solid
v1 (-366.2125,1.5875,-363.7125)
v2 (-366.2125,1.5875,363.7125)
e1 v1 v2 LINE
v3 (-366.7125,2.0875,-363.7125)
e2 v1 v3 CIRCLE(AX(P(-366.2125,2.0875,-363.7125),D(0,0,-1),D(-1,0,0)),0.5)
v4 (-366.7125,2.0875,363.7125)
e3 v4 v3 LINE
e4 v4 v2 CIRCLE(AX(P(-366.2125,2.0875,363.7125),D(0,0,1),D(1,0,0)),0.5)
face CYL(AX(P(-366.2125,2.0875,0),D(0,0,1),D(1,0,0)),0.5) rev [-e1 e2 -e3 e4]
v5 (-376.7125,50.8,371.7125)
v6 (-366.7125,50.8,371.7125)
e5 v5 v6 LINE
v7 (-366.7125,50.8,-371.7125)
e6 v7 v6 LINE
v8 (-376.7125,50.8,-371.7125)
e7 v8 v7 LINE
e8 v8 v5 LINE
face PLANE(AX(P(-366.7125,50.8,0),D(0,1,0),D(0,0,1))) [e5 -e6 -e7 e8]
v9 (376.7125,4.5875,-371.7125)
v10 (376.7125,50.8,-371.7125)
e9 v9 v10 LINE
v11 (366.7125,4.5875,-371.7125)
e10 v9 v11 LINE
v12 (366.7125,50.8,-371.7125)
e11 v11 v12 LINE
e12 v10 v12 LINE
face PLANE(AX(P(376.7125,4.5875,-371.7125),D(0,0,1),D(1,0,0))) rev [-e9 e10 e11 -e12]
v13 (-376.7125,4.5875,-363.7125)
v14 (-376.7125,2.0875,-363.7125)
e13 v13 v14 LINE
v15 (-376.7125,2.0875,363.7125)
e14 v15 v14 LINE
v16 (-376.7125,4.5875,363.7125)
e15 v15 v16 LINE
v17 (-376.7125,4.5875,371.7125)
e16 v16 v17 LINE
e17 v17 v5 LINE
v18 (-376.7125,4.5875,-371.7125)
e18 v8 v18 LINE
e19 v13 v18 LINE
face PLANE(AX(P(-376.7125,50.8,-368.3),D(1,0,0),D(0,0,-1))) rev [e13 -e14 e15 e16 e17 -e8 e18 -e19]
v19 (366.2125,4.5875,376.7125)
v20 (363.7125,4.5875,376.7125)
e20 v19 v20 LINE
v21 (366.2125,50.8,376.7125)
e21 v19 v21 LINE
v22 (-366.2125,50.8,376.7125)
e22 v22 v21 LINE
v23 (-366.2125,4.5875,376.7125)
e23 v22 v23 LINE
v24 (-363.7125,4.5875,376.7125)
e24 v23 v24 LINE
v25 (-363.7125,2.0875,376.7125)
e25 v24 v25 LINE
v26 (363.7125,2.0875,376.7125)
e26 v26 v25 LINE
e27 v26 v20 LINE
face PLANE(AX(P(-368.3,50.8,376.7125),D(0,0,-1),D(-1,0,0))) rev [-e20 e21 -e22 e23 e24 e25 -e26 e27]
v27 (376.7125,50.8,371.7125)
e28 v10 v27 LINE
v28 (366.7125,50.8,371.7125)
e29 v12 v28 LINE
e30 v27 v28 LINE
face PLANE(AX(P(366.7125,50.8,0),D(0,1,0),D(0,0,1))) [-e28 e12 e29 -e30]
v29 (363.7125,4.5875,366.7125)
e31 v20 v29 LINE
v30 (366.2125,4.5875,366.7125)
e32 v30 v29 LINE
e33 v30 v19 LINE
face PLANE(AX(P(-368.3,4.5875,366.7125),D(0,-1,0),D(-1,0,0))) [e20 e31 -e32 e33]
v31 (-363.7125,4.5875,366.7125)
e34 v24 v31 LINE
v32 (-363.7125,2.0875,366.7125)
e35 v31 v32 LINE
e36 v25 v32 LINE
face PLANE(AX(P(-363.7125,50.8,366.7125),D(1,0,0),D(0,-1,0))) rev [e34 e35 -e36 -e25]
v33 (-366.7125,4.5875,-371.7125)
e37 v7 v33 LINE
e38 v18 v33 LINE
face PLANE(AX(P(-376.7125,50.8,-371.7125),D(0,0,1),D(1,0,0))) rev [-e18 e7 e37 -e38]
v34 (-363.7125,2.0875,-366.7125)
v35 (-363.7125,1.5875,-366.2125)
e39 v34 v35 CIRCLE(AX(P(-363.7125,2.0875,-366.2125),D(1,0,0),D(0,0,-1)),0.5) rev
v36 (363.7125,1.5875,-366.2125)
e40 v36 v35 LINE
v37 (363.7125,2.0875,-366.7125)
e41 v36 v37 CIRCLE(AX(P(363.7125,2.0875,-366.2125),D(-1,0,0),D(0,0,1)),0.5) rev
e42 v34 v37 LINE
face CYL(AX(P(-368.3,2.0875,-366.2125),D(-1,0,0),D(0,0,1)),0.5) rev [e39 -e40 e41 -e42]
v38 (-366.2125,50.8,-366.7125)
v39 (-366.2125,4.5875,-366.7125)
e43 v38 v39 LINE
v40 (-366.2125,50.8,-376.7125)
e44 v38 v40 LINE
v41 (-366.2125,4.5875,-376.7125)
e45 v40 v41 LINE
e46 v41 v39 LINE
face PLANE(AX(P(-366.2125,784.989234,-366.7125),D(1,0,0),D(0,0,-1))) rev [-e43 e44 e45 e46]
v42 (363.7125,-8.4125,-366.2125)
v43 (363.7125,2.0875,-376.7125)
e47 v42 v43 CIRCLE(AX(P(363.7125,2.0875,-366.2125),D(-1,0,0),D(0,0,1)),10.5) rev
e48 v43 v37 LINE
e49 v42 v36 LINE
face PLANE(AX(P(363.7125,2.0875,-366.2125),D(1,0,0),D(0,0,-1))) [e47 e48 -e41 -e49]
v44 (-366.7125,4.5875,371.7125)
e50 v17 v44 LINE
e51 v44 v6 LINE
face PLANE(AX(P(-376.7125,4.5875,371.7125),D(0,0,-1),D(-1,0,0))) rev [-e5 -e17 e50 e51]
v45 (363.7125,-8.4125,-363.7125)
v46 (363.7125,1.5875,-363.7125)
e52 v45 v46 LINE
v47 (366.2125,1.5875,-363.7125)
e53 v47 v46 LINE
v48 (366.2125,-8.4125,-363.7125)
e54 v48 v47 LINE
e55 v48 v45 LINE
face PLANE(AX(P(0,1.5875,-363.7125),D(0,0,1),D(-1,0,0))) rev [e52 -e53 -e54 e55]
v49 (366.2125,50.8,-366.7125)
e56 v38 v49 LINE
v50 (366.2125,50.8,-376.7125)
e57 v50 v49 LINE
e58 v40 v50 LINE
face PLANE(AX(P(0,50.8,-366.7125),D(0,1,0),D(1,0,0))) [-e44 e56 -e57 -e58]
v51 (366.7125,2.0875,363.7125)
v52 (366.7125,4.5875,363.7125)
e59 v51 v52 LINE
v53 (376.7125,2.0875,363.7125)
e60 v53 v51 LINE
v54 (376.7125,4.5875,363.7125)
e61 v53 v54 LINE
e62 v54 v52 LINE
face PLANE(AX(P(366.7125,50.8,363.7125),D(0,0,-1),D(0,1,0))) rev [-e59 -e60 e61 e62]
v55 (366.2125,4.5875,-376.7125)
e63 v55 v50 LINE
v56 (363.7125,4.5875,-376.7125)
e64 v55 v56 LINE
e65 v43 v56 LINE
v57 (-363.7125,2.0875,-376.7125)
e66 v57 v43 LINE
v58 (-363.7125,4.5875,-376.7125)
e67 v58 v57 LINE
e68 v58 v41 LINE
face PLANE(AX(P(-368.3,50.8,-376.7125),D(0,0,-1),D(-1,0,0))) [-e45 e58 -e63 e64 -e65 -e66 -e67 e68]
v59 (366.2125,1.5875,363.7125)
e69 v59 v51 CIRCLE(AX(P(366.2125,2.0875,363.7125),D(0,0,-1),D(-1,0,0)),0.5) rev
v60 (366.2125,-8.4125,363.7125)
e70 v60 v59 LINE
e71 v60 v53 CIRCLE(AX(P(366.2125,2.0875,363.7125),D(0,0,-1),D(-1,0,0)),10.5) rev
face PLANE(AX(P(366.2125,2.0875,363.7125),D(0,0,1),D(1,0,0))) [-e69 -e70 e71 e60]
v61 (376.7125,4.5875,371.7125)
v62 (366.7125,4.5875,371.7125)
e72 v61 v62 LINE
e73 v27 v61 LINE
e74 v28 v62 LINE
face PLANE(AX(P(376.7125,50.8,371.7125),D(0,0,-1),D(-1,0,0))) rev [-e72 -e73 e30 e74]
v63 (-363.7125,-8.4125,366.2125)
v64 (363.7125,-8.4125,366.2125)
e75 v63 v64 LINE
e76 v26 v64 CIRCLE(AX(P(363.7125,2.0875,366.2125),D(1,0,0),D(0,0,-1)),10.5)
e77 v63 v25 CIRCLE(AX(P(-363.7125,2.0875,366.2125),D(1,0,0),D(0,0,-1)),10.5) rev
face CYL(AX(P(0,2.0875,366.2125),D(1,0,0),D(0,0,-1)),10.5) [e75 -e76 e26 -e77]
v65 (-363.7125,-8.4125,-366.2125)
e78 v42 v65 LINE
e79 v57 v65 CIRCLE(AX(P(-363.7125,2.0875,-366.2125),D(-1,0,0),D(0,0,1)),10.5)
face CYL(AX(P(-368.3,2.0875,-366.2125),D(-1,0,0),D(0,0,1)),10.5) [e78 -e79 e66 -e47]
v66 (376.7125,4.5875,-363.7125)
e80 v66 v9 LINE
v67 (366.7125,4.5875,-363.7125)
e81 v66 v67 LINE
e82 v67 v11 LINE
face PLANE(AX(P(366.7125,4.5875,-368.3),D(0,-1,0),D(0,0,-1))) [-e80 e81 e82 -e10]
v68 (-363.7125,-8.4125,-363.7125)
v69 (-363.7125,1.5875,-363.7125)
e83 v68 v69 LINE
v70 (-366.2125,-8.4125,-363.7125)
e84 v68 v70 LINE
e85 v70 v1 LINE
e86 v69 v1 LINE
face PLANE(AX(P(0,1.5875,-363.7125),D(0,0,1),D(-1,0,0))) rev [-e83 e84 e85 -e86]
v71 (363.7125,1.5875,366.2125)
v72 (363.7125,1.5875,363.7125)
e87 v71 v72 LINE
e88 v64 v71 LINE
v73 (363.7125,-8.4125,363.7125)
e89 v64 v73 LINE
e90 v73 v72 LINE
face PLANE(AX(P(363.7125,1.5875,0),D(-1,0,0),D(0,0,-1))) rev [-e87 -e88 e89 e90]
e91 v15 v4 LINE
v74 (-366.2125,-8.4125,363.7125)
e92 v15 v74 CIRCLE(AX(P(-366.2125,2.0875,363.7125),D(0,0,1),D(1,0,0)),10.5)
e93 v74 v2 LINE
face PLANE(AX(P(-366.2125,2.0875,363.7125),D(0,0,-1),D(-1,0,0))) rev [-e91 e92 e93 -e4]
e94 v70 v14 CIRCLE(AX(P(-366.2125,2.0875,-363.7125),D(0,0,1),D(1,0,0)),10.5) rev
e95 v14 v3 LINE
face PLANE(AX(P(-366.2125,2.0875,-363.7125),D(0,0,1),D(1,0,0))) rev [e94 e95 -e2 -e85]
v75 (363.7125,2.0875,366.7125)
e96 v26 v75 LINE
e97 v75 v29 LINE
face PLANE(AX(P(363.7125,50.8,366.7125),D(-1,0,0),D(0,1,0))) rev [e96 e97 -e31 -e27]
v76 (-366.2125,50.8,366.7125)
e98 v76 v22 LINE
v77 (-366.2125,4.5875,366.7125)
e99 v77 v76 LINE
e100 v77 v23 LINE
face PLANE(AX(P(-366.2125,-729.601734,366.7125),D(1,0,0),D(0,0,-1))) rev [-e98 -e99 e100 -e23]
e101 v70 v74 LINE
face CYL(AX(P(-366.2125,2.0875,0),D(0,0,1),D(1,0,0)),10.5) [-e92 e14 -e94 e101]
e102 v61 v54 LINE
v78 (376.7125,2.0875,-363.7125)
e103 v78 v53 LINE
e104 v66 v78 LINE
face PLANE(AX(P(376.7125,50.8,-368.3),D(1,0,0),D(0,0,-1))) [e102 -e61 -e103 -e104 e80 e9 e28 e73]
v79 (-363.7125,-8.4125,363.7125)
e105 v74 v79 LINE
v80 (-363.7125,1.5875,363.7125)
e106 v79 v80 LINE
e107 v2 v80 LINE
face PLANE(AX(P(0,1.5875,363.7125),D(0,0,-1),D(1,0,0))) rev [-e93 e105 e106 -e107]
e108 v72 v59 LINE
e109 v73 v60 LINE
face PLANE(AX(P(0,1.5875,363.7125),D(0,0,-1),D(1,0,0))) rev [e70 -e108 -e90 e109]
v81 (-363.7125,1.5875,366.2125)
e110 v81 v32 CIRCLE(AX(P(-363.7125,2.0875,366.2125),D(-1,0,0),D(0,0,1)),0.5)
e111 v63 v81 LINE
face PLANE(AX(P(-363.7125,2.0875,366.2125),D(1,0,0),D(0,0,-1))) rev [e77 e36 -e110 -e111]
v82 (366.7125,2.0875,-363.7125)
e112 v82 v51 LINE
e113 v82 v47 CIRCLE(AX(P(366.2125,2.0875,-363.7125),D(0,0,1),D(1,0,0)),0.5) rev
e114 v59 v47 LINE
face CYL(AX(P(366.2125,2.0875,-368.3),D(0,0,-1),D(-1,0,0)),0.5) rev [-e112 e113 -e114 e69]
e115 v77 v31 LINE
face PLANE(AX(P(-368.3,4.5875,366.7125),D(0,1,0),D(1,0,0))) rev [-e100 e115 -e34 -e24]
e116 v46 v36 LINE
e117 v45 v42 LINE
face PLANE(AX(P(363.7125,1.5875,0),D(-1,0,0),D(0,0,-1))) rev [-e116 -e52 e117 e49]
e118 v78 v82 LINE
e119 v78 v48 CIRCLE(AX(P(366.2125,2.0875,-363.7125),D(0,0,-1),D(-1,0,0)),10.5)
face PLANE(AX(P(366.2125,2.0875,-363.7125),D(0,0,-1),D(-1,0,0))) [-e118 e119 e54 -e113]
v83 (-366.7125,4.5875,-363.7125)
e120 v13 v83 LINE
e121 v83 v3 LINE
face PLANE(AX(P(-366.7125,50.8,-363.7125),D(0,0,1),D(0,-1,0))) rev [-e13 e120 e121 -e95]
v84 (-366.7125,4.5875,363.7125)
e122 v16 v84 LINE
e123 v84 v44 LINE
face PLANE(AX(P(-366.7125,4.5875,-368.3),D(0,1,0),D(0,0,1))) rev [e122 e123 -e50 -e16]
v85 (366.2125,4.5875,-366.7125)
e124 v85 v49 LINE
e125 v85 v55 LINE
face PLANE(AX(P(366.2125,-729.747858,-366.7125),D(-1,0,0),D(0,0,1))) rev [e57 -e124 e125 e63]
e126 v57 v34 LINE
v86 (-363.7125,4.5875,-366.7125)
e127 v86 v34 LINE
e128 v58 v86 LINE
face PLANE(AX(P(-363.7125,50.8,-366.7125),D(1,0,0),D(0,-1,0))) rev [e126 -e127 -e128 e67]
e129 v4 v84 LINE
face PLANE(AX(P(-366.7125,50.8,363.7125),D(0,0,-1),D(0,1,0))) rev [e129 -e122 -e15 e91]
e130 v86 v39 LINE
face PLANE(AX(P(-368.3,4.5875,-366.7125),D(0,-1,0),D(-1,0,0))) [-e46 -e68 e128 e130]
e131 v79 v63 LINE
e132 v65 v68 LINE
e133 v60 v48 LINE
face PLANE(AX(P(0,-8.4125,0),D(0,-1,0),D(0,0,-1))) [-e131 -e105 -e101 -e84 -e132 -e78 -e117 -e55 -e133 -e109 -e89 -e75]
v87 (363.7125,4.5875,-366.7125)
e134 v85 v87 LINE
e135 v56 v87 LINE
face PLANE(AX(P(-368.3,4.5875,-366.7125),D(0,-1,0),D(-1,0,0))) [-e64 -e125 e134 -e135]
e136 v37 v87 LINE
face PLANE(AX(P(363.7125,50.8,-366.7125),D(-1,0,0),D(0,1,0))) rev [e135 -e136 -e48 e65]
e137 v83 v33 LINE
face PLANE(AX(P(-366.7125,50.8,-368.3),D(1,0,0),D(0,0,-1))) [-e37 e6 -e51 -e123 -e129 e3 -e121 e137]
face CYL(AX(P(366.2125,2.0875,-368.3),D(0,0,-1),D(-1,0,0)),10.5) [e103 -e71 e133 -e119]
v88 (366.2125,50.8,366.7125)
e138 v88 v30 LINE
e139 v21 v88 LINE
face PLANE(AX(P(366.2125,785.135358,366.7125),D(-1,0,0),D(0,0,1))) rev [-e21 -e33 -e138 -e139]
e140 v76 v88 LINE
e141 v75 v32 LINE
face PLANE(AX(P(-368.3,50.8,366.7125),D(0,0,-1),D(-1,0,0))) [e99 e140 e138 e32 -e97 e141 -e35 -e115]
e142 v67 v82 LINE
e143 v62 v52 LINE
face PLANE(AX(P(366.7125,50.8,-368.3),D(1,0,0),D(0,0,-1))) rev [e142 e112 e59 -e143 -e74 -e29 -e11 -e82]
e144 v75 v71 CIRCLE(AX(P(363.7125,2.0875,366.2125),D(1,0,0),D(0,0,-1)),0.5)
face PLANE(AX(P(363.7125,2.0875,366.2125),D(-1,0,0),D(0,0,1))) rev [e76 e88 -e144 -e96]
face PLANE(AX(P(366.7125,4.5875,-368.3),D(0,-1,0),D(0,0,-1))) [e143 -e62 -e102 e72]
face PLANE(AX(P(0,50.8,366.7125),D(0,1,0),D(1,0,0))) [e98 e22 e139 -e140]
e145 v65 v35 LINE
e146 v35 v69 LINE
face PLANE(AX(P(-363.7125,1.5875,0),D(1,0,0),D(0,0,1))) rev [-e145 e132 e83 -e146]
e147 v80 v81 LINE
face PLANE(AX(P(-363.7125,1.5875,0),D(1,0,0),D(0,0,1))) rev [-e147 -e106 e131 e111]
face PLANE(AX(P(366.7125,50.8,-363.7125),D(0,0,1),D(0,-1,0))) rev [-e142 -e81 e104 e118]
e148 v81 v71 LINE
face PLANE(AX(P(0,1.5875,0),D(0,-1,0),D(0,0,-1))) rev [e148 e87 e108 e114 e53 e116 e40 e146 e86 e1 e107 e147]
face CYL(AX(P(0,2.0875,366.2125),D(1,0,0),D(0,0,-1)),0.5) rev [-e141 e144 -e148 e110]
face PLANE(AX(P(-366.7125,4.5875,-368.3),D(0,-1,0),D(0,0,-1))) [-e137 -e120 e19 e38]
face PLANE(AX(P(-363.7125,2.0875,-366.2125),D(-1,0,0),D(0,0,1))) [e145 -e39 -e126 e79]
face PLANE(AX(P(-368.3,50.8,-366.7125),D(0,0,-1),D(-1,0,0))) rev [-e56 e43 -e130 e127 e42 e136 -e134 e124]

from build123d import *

# Parameters (mm, degrees)
SKETCH1_W                    = 736.6
SKETCH1_H                    = 736.6
BOSS_EXTRUDE1_DEPTH          = 50.8
SHELL1_T                     = -1.5875
CONVERT_SOLID1_START         = -368.3
CONVERT_SOLID1_DEPTH         = 4.587500016
CONVERT_SOLID1_START_2       = 363.712499984
CONVERT_SOLID1_2_DEPTH       = 4.587500016
CONVERT_SOLID1_START_3       = -363.712499984
CONVERT_SOLID1_3_DEPTH       = 727.424999968
CONVERT_SOLID1_START_4       = -376.7125
CONVERT_SOLID1_4_DEPTH       = 10.500000016
CONVERT_SOLID1_START_5       = 366.212499984
CONVERT_SOLID1_5_DEPTH       = 10.500000016
CONVERT_SOLID1_START_6       = -371.7125
CONVERT_SOLID1_6_OUTLINE_W   = 727.424999968
CONVERT_SOLID1_6_OUTLINE_H   = 8.4125
CONVERT_SOLID1_6_OUTLINE_W_2 = 10
CONVERT_SOLID1_6_OUTLINE_H_2 = 46.212499984
CONVERT_SOLID1_6_DEPTH       = 743.425
CONVERT_SOLID1_START_7       = -366.2125
CONVERT_SOLID1_7_DEPTH       = 732.425
CONVERT_SOLID1_START_8       = -366.7125
CONVERT_SOLID1_8_OUTLINE_W   = 49.2125
CONVERT_SOLID1_8_OUTLINE_H   = 1.5875
CONVERT_SOLID1_8_DEPTH       = 0.5
CONVERT_SOLID1_START_9       = 366.2125
CONVERT_SOLID1_9_OUTLINE_W   = 49.2125
CONVERT_SOLID1_9_OUTLINE_H   = 1.5875
CONVERT_SOLID1_9_DEPTH       = 0.5
CONVERT_SOLID1_10_OUTLINE_W  = 3.000000016
CONVERT_SOLID1_10_OUTLINE_H  = 1.5875
CONVERT_SOLID1_10_DEPTH      = 2.500000016
CONVERT_SOLID1_11_OUTLINE_W  = 3.000000016
CONVERT_SOLID1_11_OUTLINE_H  = 1.5875
CONVERT_SOLID1_11_DEPTH      = 2.500000016


with BuildPart() as part:
    # Sketch1 → Boss-Extrude1 (new body)
    with BuildSketch(Plane(origin=(0, 0, 0), x_dir=(1, 0, 0), z_dir=(0, 1, 0))):
        Rectangle(SKETCH1_W, SKETCH1_H)
    extrude(amount=BOSS_EXTRUDE1_DEPTH)

    # Shell1
    shell1_openings = [part.faces().sort_by_distance(p)[0] for p in [
        (0, 50.8, 0),
    ]]
    offset(amount=SHELL1_T, openings=shell1_openings, kind=Kind.INTERSECTION)

    # Convert-Solid1: read off the stored shape, not the designer's step
    # Convert-Solid1 outline → Convert-Solid1 (cut)
    with BuildSketch(Plane.XY.offset(CONVERT_SOLID1_START)):
        with BuildLine():
            Line((366.212499984, 1.5875), (363.712499984, 1.5875))
            Line((363.712499984, 1.5875), (363.712499984, 0))
            Line((363.712499984, 0), (368.3, 0))
            Line((368.3, 0), (368.3, 4.587500016))
            Line((368.3, 4.587500016), (366.7125, 4.587500016))
            Line((366.7125, 4.587500016), (366.7125, 2.087500016))
            ThreePointArc((366.7125, 2.087500016), (366.566053386, 1.733946614), (366.212499984, 1.5875))
        make_face()
        with BuildLine():
            Line((-363.712499984, 0), (-363.712499984, 1.5875))
            Line((-363.712499984, 1.5875), (-366.212499984, 1.5875))
            ThreePointArc((-366.212499984, 1.5875), (-366.566053386, 1.733946614), (-366.7125, 2.087500016))
            Line((-366.7125, 2.087500016), (-366.7125, 4.587500016))
            Line((-366.7125, 4.587500016), (-368.3, 4.587500016))
            Line((-368.3, 4.587500016), (-368.3, 0))
            Line((-368.3, 0), (-363.712499984, 0))
        make_face()
    extrude(amount=CONVERT_SOLID1_DEPTH, mode=Mode.SUBTRACT)

    # Convert-Solid1 2 outline → Convert-Solid1 2 (cut)
    with BuildSketch(Plane.XY.offset(CONVERT_SOLID1_START_2)):
        with BuildLine():
            Line((366.212499984, 1.5875), (363.712499984, 1.5875))
            Line((363.712499984, 1.5875), (363.712499984, 0))
            Line((363.712499984, 0), (368.3, 0))
            Line((368.3, 0), (368.3, 4.587500016))
            Line((368.3, 4.587500016), (366.7125, 4.587500016))
            Line((366.7125, 4.587500016), (366.7125, 2.087500016))
            ThreePointArc((366.7125, 2.087500016), (366.566053386, 1.733946614), (366.212499984, 1.5875))
        make_face()
        with BuildLine():
            Line((-363.712499984, 0), (-363.712499984, 1.5875))
            Line((-363.712499984, 1.5875), (-366.212499984, 1.5875))
            ThreePointArc((-366.212499984, 1.5875), (-366.566053386, 1.733946614), (-366.7125, 2.087500016))
            Line((-366.7125, 2.087500016), (-366.7125, 4.587500016))
            Line((-366.7125, 4.587500016), (-368.3, 4.587500016))
            Line((-368.3, 4.587500016), (-368.3, 0))
            Line((-368.3, 0), (-363.712499984, 0))
        make_face()
    extrude(amount=CONVERT_SOLID1_2_DEPTH, mode=Mode.SUBTRACT)

    # Convert-Solid1 3 outline → Convert-Solid1 3 (add)
    with BuildSketch(Plane.XY.offset(CONVERT_SOLID1_START_3)):
        with BuildLine():
            Line((368.3, 0), (-368.3, 0))
            Line((-368.3, 0), (-368.3, 50.8))
            Line((-368.3, 50.8), (-376.7125, 50.8))
            Line((-376.7125, 50.8), (-376.7125, 2.087500016))
            ThreePointArc((-376.7125, 2.087500016), (-373.637121198, -5.337121198), (-366.212499984, -8.4125))
            Line((-366.212499984, -8.4125), (366.212499984, -8.4125))
            ThreePointArc((366.212499984, -8.4125), (373.637121198, -5.337121198), (376.7125, 2.087500016))
            Line((376.7125, 2.087500016), (376.7125, 50.8))
            Line((376.7125, 50.8), (368.3, 50.8))
            Line((368.3, 50.8), (368.3, 0))
        make_face()
        with BuildLine():
            ThreePointArc((366.7125, 2.087500016), (366.566053386, 1.733946614), (366.212499984, 1.5875))
            Line((366.212499984, 1.5875), (366.7125, 1.5875))
            Line((366.7125, 1.5875), (366.7125, 2.087500016))
        make_face()
        with BuildLine():
            Line((-366.7125, 1.5875), (-366.212499984, 1.5875))
            ThreePointArc((-366.212499984, 1.5875), (-366.566053386, 1.733946614), (-366.7125, 2.087500016))
            Line((-366.7125, 2.087500016), (-366.7125, 1.5875))
        make_face()
    extrude(amount=CONVERT_SOLID1_3_DEPTH)

    # Convert-Solid1 4 outline → Convert-Solid1 4 (add)
    with BuildSketch(Plane.XY.offset(CONVERT_SOLID1_START_4)):
        Polygon((-363.712499984, -8.4125), (363.712499984, -8.4125), (363.712499984, 4.587500016), (366.2125, 4.587500016), (366.2125, 50.8), (-366.2125, 50.8), (-366.2125, 4.587500016), (-363.712499984, 4.587500016), align=None)
    extrude(amount=CONVERT_SOLID1_4_DEPTH)

    # Convert-Solid1 5 outline → Convert-Solid1 5 (add)
    with BuildSketch(Plane.XY.offset(CONVERT_SOLID1_START_5)):
        Polygon((-363.712499984, -8.4125), (363.712499984, -8.4125), (363.712499984, 4.587500016), (366.2125, 4.587500016), (366.2125, 50.8), (-366.2125, 50.8), (-366.2125, 4.587500016), (-363.712499984, 4.587500016), align=None)
    extrude(amount=CONVERT_SOLID1_5_DEPTH)

    # Convert-Solid1 6 outline → Convert-Solid1 6 (add)
    with BuildSketch(Plane.XY.offset(CONVERT_SOLID1_START_6)):
        with Locations((0, -4.20625)):
            Rectangle(CONVERT_SOLID1_6_OUTLINE_W, CONVERT_SOLID1_6_OUTLINE_H)
        with Locations((371.7125, 27.693750008)):
            Rectangle(CONVERT_SOLID1_6_OUTLINE_W_2, CONVERT_SOLID1_6_OUTLINE_H_2)
        with Locations((-371.7125, 27.693750008)):
            Rectangle(CONVERT_SOLID1_6_OUTLINE_W_2, CONVERT_SOLID1_6_OUTLINE_H_2)
    extrude(amount=CONVERT_SOLID1_6_DEPTH)

    # Convert-Solid1 7 outline → Convert-Solid1 7 (cut)
    with BuildSketch(Plane.YZ.offset(CONVERT_SOLID1_START_7)):
        with BuildLine():
            Line((50.8, -366.212499984), (1.5875, -366.212499984))
            ThreePointArc((1.5875, -366.212499984), (1.733946614, -366.566053386), (2.087500016, -366.7125))
            Line((2.087500016, -366.7125), (50.8, -366.7125))
            Line((50.8, -366.7125), (50.8, -366.212499984))
        make_face()
        with BuildLine():
            Line((50.8, 366.212499984), (50.8, 366.7125))
            Line((50.8, 366.7125), (2.087500016, 366.7125))
            ThreePointArc((2.087500016, 366.7125), (1.733946614, 366.566053386), (1.5875, 366.212499984))
            Line((1.5875, 366.212499984), (50.8, 366.212499984))
        make_face()
        with BuildLine():
            Line((-8.4125, -376.7125), (2.087500016, -376.7125))
            ThreePointArc((2.087500016, -376.7125), (-5.337121198, -373.637121198), (-8.4125, -366.212499984))
            Line((-8.4125, -366.212499984), (-8.4125, -376.7125))
        make_face()
        with BuildLine():
            Line((-8.4125, 376.7125), (-8.4125, 366.212499984))
            ThreePointArc((-8.4125, 366.212499984), (-5.337121198, 373.637121198), (2.087500016, 376.7125))
            Line((2.087500016, 376.7125), (-8.4125, 376.7125))
        make_face()
    extrude(amount=CONVERT_SOLID1_7_DEPTH, mode=Mode.SUBTRACT)

    # Convert-Solid1 8 outline → Convert-Solid1 8 (cut)
    with BuildSketch(Plane.YZ.offset(CONVERT_SOLID1_START_8)):
        with Locations((26.19375, -367.50625)):
            Rectangle(CONVERT_SOLID1_8_OUTLINE_W, CONVERT_SOLID1_8_OUTLINE_H)
        with Locations((26.19375, 367.50625)):
            Rectangle(CONVERT_SOLID1_8_OUTLINE_W, CONVERT_SOLID1_8_OUTLINE_H)
    extrude(amount=CONVERT_SOLID1_8_DEPTH, mode=Mode.SUBTRACT)

    # Convert-Solid1 9 outline → Convert-Solid1 9 (cut)
    with BuildSketch(Plane.YZ.offset(CONVERT_SOLID1_START_9)):
        with Locations((26.19375, -367.50625)):
            Rectangle(CONVERT_SOLID1_9_OUTLINE_W, CONVERT_SOLID1_9_OUTLINE_H)
        with Locations((26.19375, 367.50625)):
            Rectangle(CONVERT_SOLID1_9_OUTLINE_W, CONVERT_SOLID1_9_OUTLINE_H)
    extrude(amount=CONVERT_SOLID1_9_DEPTH, mode=Mode.SUBTRACT)

    # Convert-Solid1 10 outline → Convert-Solid1 10 (cut)
    with BuildSketch(Plane.YZ.offset(CONVERT_SOLID1_START_7)):
        with Locations((3.087500008, -367.50625)):
            Rectangle(CONVERT_SOLID1_10_OUTLINE_W, CONVERT_SOLID1_10_OUTLINE_H)
        with Locations((3.087500008, 367.50625)):
            Rectangle(CONVERT_SOLID1_10_OUTLINE_W, CONVERT_SOLID1_10_OUTLINE_H)
    extrude(amount=CONVERT_SOLID1_10_DEPTH, mode=Mode.SUBTRACT)

    # Convert-Solid1 11 outline → Convert-Solid1 11 (cut)
    with BuildSketch(Plane.YZ.offset(CONVERT_SOLID1_START_2)):
        with Locations((3.087500008, -367.50625)):
            Rectangle(CONVERT_SOLID1_11_OUTLINE_W, CONVERT_SOLID1_11_OUTLINE_H)
        with Locations((3.087500008, 367.50625)):
            Rectangle(CONVERT_SOLID1_11_OUTLINE_W, CONVERT_SOLID1_11_OUTLINE_H)
    extrude(amount=CONVERT_SOLID1_11_DEPTH, mode=Mode.SUBTRACT)


solid = part.part
